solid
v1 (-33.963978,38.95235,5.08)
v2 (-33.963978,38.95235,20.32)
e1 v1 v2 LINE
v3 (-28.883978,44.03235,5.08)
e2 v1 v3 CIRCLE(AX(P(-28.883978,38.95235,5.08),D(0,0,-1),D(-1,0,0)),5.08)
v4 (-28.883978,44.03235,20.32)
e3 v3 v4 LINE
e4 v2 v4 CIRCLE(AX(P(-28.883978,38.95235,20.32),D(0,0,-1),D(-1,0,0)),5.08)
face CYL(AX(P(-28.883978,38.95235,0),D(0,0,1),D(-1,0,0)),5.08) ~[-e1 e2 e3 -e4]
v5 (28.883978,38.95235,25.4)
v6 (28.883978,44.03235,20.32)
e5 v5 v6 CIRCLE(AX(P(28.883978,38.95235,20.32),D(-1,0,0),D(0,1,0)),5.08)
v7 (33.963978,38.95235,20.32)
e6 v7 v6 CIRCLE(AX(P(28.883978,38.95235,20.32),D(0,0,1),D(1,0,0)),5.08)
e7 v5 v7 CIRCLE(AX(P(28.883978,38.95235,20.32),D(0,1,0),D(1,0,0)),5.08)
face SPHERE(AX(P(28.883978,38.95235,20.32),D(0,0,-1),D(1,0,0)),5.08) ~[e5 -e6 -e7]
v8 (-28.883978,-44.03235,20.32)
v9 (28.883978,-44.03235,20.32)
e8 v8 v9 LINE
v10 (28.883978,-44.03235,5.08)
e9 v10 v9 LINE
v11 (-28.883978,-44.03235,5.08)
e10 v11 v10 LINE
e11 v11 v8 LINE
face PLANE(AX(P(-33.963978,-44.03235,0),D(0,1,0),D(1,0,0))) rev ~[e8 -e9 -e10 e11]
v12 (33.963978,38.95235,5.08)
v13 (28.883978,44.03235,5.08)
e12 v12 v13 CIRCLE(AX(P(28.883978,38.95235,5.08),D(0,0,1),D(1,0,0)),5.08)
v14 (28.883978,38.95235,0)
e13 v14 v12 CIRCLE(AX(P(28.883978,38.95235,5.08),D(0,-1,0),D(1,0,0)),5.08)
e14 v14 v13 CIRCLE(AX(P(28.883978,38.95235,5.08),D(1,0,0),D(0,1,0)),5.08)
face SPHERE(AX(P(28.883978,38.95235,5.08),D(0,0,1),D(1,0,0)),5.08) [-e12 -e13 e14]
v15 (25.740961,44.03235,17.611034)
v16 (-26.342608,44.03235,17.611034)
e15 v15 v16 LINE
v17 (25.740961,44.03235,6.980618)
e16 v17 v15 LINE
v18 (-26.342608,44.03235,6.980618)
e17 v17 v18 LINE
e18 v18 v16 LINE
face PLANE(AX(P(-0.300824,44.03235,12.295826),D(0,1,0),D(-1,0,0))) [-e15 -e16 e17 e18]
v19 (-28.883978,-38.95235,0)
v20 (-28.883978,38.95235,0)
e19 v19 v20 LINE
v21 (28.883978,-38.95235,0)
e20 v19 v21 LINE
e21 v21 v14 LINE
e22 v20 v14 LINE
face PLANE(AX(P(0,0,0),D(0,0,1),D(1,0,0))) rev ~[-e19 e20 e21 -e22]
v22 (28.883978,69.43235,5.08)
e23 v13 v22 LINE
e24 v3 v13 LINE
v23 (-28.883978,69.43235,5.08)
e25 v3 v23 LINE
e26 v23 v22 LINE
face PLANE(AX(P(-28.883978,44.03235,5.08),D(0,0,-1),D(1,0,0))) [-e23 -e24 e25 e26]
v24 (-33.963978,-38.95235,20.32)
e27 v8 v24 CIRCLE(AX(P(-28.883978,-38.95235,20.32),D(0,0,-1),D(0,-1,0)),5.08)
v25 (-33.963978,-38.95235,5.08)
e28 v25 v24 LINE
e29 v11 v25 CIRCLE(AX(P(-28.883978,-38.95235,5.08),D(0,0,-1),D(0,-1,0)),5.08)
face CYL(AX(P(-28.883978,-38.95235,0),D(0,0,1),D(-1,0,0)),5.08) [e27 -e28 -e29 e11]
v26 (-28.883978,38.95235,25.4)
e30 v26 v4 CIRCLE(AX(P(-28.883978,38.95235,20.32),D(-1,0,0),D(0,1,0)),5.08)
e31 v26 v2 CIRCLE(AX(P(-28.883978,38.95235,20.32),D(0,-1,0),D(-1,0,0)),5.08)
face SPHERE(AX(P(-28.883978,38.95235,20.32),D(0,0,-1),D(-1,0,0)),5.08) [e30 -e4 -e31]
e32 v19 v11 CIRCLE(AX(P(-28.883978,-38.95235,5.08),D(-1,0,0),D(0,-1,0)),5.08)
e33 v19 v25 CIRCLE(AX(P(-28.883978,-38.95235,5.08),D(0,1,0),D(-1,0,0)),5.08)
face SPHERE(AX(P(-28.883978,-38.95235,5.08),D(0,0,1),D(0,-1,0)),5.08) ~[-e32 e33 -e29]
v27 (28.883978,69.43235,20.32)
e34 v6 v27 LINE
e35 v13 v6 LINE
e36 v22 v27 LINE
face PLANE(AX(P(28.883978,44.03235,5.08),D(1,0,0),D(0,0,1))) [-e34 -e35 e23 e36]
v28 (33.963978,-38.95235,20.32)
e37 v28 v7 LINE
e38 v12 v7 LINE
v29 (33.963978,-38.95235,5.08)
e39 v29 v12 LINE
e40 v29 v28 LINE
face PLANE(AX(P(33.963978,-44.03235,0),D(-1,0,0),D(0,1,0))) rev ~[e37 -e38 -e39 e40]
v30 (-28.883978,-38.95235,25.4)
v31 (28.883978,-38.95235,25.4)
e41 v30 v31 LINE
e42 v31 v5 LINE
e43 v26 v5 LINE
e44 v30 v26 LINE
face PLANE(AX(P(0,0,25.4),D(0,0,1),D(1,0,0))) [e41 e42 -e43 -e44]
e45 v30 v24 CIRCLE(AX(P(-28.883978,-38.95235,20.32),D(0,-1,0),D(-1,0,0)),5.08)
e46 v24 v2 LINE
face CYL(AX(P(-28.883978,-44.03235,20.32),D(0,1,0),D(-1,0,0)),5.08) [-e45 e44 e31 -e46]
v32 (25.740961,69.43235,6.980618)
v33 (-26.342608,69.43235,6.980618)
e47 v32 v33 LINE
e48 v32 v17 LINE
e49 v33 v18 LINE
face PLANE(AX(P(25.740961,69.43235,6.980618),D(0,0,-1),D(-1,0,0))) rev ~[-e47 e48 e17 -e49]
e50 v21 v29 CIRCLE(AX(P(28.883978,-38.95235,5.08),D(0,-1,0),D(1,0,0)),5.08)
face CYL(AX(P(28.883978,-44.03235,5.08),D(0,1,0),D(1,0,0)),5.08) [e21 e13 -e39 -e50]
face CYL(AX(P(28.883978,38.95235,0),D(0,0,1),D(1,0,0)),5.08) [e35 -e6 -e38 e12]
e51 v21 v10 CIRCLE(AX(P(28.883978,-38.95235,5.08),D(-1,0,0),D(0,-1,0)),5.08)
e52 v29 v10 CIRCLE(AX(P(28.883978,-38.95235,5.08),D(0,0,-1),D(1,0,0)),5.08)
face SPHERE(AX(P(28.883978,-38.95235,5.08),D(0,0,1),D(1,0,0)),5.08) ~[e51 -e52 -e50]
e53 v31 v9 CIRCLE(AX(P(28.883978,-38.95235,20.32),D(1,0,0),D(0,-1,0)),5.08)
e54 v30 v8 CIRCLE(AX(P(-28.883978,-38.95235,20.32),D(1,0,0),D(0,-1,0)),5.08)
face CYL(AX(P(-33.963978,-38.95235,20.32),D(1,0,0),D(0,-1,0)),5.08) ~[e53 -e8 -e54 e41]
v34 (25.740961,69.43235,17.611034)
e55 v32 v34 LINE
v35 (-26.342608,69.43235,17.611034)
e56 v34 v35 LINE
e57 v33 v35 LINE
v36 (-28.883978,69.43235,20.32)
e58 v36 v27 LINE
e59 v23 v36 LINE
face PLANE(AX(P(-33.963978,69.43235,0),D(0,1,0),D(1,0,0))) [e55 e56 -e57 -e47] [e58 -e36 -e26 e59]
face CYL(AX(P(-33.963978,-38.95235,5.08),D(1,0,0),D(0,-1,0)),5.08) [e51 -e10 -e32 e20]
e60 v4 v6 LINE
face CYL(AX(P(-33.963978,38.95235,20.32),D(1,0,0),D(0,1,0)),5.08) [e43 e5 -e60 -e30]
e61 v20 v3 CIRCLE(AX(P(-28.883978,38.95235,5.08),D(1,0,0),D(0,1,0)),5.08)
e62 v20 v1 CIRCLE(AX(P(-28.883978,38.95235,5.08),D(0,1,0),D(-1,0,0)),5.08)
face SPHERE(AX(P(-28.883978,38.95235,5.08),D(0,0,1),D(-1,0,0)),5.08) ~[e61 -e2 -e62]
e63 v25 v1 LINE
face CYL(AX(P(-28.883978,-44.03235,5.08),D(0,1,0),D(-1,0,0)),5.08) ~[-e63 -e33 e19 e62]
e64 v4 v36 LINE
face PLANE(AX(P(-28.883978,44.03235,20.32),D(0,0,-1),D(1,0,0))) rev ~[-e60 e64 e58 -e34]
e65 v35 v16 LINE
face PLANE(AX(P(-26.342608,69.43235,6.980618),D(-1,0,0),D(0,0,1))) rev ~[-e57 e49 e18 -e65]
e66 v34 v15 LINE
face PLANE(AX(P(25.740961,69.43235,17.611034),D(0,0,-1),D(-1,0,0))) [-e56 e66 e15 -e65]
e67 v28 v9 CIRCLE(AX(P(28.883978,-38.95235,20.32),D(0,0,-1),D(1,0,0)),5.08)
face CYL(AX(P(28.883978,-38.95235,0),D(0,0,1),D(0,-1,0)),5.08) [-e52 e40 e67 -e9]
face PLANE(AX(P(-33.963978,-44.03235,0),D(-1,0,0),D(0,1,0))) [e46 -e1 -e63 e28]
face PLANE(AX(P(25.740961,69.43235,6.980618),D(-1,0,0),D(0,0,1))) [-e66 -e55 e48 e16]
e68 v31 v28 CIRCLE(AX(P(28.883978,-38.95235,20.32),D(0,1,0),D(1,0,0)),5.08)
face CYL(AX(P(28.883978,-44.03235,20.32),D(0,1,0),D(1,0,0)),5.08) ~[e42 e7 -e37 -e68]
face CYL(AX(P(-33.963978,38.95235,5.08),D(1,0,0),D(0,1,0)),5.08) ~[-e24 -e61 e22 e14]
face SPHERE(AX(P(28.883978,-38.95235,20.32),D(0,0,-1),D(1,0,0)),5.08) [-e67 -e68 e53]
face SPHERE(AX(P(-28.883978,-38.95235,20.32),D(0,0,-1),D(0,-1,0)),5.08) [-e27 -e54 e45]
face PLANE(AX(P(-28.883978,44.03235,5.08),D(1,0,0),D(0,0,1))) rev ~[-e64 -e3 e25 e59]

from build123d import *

# Parameters (mm, degrees)
F0_W     = 67.9279565811
F0_H     = 88.0647003651
F1_DEPTH = 25.4
F2_R     = 5.08
F3_DEPTH = 25.4
F4_W     = 52.0835686475
F4_H     = 10.6304162182
F5_DEPTH = 25.4


# Not quite as in the source:
# - a feature of the source that left no trace in its solid (it failed there, or was rolled back) is left out


with BuildPart() as f1:
    # F0 (on Top) → F1 (new body)
    with BuildSketch(Plane.XY):
        Rectangle(F0_W, F0_H)
    extrude(amount=F1_DEPTH)

    # F2
    f2_edges = [f1.edges().sort_by_distance(p)[0] for p in [
        (33.963978, -44.03235, 12.7),
        (33.963978, 44.03235, 12.7),
        (33.963978, 0, 0),
        (33.963978, 0, 25.4),
        (-33.963978, -44.03235, 12.7),
        (0, -44.03235, 0),
        (0, -44.03235, 25.4),
        (-33.963978, 44.03235, 12.7),
        (-33.963978, 0, 0),
        (-33.963978, 0, 25.4),
        (0, 44.03235, 0),
        (0, 44.03235, 25.4),
    ]]
    fillet(f2_edges, radius=F2_R)

    # F3 (add): a face of the model
    f3_faces = [f1.faces().sort_by_distance(p)[0] for p in [
        (0, 44.0323501825, 12.7),
    ]]
    extrude(f3_faces, amount=F3_DEPTH)

    # F4 (on face) → F5 (cut)
    with BuildSketch(Plane(origin=(0, 69.4323501825, 0), x_dir=(-1, 0, 0), z_dir=(0, 1, 0))):
        with Locations((0.3008237109, 12.2958261054)):
            Rectangle(F4_W, F4_H)
    extrude(amount=-F5_DEPTH, mode=Mode.SUBTRACT)


solid = f1.part
